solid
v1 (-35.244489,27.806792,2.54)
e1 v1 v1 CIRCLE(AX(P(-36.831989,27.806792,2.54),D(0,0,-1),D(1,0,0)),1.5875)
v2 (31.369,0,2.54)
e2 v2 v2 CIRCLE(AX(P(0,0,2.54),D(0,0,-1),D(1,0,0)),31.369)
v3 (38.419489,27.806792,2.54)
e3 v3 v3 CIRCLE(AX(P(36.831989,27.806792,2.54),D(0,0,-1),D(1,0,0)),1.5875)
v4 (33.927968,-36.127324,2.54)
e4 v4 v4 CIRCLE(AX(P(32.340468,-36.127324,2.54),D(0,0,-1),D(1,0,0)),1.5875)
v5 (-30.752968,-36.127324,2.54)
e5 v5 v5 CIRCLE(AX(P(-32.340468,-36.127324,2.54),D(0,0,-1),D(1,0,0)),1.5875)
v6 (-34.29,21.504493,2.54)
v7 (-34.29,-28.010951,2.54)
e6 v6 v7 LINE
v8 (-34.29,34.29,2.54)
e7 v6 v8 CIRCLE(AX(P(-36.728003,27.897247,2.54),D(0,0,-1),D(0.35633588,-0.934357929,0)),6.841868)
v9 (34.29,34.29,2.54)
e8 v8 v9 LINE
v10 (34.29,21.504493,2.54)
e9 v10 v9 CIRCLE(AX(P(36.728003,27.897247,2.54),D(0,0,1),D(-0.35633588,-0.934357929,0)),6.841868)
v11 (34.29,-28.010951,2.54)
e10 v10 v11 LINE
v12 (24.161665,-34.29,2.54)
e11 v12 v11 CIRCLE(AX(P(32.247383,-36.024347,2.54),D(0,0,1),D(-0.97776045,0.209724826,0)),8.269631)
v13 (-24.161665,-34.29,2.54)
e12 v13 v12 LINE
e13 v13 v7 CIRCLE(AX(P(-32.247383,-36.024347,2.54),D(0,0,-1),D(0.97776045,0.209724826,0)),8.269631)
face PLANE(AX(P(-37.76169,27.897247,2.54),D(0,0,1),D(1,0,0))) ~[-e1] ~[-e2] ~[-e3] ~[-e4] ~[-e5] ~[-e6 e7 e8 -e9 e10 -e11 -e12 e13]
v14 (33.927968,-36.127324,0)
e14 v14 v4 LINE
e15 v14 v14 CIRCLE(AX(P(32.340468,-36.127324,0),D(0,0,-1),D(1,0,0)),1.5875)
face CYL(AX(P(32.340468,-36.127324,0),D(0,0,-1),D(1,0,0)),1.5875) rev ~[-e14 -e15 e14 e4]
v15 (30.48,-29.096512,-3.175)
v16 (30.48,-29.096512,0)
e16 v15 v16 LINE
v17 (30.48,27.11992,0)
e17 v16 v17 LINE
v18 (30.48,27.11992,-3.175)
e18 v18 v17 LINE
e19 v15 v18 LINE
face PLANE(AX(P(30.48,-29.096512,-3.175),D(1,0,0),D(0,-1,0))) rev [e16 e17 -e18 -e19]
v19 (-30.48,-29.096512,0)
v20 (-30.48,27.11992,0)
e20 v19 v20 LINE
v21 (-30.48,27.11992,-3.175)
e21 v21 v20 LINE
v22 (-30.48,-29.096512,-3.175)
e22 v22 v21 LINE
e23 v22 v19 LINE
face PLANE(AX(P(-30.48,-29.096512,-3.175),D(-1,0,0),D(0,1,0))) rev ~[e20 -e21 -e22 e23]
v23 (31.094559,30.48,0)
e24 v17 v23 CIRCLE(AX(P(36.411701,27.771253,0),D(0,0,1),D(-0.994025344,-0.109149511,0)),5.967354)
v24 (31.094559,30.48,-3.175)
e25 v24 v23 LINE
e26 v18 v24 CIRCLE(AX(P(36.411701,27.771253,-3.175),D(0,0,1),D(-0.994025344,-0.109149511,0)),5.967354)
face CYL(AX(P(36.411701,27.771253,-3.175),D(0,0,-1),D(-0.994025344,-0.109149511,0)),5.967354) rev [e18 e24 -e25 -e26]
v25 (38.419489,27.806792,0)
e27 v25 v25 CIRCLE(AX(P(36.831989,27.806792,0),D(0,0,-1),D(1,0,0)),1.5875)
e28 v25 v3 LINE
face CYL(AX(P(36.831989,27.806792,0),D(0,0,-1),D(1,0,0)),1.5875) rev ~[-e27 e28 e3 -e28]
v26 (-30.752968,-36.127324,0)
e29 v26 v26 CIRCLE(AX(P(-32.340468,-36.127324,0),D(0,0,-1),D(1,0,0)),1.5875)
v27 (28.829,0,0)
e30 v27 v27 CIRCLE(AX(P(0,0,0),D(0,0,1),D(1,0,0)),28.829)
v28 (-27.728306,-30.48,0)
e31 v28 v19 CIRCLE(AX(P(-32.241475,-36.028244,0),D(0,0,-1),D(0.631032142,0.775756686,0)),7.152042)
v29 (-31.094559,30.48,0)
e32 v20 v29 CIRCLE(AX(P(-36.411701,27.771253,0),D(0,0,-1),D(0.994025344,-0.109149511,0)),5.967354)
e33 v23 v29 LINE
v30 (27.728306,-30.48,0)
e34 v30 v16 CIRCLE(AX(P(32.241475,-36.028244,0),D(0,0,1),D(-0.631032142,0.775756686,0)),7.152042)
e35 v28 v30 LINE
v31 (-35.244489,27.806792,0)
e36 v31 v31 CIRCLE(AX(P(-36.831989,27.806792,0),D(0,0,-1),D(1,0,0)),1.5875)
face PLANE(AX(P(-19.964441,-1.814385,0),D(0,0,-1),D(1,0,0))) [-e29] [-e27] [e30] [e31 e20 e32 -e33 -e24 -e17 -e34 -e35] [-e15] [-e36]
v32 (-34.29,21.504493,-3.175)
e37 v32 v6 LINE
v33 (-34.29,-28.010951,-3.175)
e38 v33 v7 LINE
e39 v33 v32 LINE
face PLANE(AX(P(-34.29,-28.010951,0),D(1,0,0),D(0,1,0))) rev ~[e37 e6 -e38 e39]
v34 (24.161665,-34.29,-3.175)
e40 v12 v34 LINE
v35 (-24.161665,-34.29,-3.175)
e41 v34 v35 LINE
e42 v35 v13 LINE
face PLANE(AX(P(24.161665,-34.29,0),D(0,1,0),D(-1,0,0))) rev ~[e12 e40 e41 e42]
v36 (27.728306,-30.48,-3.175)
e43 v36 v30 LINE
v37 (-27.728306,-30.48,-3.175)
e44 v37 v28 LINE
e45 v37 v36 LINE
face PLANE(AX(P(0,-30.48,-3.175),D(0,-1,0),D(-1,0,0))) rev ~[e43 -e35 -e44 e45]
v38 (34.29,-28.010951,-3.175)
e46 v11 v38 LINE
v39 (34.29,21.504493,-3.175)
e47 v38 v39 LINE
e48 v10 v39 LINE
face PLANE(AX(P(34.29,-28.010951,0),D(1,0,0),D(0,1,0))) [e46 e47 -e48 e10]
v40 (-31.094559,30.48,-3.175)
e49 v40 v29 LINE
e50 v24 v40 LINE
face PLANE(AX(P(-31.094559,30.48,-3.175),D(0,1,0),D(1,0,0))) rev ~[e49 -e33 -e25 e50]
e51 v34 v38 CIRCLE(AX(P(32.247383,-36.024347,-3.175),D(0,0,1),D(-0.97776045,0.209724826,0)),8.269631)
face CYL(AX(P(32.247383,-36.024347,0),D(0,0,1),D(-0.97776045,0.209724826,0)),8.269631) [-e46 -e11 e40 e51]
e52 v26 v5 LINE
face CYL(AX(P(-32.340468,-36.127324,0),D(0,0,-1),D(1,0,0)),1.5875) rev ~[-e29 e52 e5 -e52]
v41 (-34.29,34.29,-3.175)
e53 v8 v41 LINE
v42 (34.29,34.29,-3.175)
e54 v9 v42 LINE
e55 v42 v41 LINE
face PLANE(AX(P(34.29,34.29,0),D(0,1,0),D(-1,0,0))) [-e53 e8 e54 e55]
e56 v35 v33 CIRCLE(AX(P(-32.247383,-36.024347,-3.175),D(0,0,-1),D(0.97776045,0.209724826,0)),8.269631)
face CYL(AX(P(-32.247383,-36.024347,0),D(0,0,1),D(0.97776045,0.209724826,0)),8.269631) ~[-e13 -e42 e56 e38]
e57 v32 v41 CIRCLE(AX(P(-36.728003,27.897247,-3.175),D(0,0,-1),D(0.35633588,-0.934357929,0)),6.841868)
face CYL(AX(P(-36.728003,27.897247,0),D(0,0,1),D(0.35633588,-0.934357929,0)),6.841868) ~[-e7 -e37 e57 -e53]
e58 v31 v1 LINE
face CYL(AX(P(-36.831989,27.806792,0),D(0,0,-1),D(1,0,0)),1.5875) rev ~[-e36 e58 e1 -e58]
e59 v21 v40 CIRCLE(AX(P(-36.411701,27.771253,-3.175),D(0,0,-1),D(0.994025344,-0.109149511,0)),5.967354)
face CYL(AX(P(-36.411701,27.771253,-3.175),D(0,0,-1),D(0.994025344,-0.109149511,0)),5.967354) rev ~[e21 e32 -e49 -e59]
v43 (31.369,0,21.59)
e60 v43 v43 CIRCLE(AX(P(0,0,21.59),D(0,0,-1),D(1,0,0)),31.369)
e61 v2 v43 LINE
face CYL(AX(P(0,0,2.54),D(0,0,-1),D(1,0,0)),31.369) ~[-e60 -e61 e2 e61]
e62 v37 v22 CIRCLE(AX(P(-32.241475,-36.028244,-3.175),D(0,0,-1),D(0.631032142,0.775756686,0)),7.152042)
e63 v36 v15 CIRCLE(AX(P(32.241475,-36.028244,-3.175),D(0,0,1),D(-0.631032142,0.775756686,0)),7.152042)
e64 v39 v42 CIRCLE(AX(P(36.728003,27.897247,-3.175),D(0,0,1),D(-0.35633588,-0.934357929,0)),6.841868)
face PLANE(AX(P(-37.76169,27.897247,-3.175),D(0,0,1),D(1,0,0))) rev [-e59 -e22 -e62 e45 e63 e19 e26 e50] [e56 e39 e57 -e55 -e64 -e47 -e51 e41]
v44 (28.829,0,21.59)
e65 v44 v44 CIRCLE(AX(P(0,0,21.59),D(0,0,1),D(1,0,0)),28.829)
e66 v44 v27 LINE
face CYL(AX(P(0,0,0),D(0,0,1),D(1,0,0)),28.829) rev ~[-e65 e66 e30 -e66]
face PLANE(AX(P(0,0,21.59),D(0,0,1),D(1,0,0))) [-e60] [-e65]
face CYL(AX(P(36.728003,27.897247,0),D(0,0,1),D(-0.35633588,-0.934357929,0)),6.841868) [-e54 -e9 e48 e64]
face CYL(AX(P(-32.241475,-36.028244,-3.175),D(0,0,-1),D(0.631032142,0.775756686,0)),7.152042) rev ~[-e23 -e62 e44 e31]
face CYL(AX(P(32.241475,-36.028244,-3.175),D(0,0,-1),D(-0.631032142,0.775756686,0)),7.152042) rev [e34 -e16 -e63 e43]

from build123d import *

# Parameters (mm, degrees)
F0_W      = 31.75
F0_H      = 31.75
F1_DEPTH  = 2.54
F2_R      = 28.829
F3_DEPTH  = 25.4
F4_DEPTH  = 2.54
F5_DEPTH  = 2.54
F6_DEPTH  = 2.54
F7_DEPTH  = 2.54
F8_R      = 31.369
F8_R_2    = 28.829
F9_DEPTH  = 19.05
F12_DEPTH = 2.54
F15_DEPTH = 2.54
F17_DEPTH = 3.175
F19_DEPTH = 3.175
F20_R     = 1.5875
F21_DEPTH = 25.4


# Not quite as in the source:
# - a pattern or mirror of a feature is missing from the dataset's text; its kind, count and spacing are read off the source's solid


with BuildPart() as f1:
    # F0 (on Top) → F1 (new body)
    with BuildSketch(Plane.XY):
        with Locations((-15.875, 15.875)):
            Rectangle(F0_W, F0_H)
        with Locations((15.875, -15.875)):
            Rectangle(F0_W, F0_H)
        with Locations((15.875, 15.875)):
            Rectangle(F0_W, F0_H)
        with Locations((-15.875, -15.875)):
            Rectangle(F0_W, F0_H)
    extrude(amount=F1_DEPTH)

    # F2 (on face) → F3 (cut)
    with BuildSketch(Plane.XY.offset(2.54)):
        Circle(F2_R)
    extrude(amount=-F3_DEPTH, mode=Mode.SUBTRACT)

    # F4 (add): a face of the model
    f4_faces = [f1.faces().sort_by_distance(p)[0] for p in [
        (0, -31.75, 1.27),
    ]]
    extrude(f4_faces, amount=F4_DEPTH)

    # F5 (add): a face of the model
    f5_faces = [f1.faces().sort_by_distance(p)[0] for p in [
        (0, 31.75, 1.27),
    ]]
    extrude(f5_faces, amount=F5_DEPTH)

    # F6 (add): a face of the model
    f6_faces = [f1.faces().sort_by_distance(p)[0] for p in [
        (31.75, 0, 1.27),
    ]]
    extrude(f6_faces, amount=F6_DEPTH)

    # F7 (add): a face of the model
    f7_faces = [f1.faces().sort_by_distance(p)[0] for p in [
        (-31.75, 0, 1.27),
    ]]
    extrude(f7_faces, amount=F7_DEPTH)

    # F8 (on face) → F9 (join)
    with BuildSketch(Plane.XY.offset(2.54)):
        Circle(F8_R)
        Circle(F8_R_2, mode=Mode.SUBTRACT)
    extrude(amount=F9_DEPTH)

    # F11 (on face) → F12 (join)
    with BuildSketch(Plane.XY.offset(2.54)):
        with BuildLine():
            Line((34.29, -34.29), (24.1616647691, -34.29))
            ThreePointArc((24.1616647691, -34.29), (36.604718933, -43.052889693), (34.29, -28.0109513551))
            Line((34.29, -28.0109513551), (34.29, -34.29))
        make_face()
    extrude(amount=-F12_DEPTH)

    # F13: F1 across plane


with BuildPart() as f1_1:
    add(f1.part)
    add(f1.part.mirror(Plane(origin=(0, 0, 1.27), x_dir=(0, -1, 0), z_dir=(-1, 0, 0))))

    # F14 (on face) → F15 (join)
    with BuildSketch(Plane.XY.offset(2.54)):
        with BuildLine():
            Line((34.29, 34.29), (34.29, 21.5044934303))
            ThreePointArc((34.29, 21.5044934303), (43.5698705735, 27.8972467151), (34.29, 34.29))
        make_face()
    extrude(amount=-F15_DEPTH)

    # F16: F1 across plane


with BuildPart() as f1_2:
    add(f1_1.part)
    add(f1_1.part.mirror(Plane(origin=(0, 0, 1.27), x_dir=(0, -1, 0), z_dir=(-1, 0, 0))))

    # F17 (add): a face of the model
    f17_faces = [f1_2.faces().sort_by_distance(p)[0] for p in [
        (0, -33.113583232, 0),
    ]]
    extrude(f17_faces, amount=F17_DEPTH)

    # F18 (on face) → F19 (cut)
    with BuildSketch(Plane(origin=(0, 0, -3.175), x_dir=(1, 0, 0), z_dir=(0, 0, -1))):
        with BuildLine():
            Line((0, 30.48), (-27.7283061296, 30.48))
            ThreePointArc((-27.7283061296, 30.48), (-35.4541518447, 42.4181121108), (-30.48, 29.0965121239))
            Line((-30.48, 29.0965121239), (-30.48, 3.2532289624))
            Line((-30.48, 3.2532289624), (-30.48, -27.1199196577))
            ThreePointArc((-30.48, -27.1199196577), (-42.2816797053, -26.6976345281), (-31.094558537, -30.48))
            Line((-31.094558537, -30.48), (0, -30.48))
            Line((0, -30.48), (0, 30.48))
        make_face()
    f19 = extrude(amount=-F19_DEPTH, mode=Mode.SUBTRACT)

    # F19_copies: F19 across plane
    add(f19.mirror(Plane(origin=(0, 0, 0), x_dir=(0, 0, 1), z_dir=(1, 0, 0))), mode=Mode.SUBTRACT)

    # F20 (on face) → F21 (cut)
    with BuildSketch(Plane(origin=(0, 0, 0), x_dir=(1, 0, 0), z_dir=(0, 0, -1))):
        with Locations((-32.3404680081, 36.1273235781)):
            Circle(F20_R)
        with Locations((32.3404680081, 36.1273235781)):
            Circle(F20_R)
        with Locations((36.8319889795, -27.8067924424)):
            Circle(F20_R)
        with Locations((-36.8319889795, -27.8067924424)):
            Circle(F20_R)
    extrude(amount=-F21_DEPTH, mode=Mode.SUBTRACT)


solid = f1_2.part
